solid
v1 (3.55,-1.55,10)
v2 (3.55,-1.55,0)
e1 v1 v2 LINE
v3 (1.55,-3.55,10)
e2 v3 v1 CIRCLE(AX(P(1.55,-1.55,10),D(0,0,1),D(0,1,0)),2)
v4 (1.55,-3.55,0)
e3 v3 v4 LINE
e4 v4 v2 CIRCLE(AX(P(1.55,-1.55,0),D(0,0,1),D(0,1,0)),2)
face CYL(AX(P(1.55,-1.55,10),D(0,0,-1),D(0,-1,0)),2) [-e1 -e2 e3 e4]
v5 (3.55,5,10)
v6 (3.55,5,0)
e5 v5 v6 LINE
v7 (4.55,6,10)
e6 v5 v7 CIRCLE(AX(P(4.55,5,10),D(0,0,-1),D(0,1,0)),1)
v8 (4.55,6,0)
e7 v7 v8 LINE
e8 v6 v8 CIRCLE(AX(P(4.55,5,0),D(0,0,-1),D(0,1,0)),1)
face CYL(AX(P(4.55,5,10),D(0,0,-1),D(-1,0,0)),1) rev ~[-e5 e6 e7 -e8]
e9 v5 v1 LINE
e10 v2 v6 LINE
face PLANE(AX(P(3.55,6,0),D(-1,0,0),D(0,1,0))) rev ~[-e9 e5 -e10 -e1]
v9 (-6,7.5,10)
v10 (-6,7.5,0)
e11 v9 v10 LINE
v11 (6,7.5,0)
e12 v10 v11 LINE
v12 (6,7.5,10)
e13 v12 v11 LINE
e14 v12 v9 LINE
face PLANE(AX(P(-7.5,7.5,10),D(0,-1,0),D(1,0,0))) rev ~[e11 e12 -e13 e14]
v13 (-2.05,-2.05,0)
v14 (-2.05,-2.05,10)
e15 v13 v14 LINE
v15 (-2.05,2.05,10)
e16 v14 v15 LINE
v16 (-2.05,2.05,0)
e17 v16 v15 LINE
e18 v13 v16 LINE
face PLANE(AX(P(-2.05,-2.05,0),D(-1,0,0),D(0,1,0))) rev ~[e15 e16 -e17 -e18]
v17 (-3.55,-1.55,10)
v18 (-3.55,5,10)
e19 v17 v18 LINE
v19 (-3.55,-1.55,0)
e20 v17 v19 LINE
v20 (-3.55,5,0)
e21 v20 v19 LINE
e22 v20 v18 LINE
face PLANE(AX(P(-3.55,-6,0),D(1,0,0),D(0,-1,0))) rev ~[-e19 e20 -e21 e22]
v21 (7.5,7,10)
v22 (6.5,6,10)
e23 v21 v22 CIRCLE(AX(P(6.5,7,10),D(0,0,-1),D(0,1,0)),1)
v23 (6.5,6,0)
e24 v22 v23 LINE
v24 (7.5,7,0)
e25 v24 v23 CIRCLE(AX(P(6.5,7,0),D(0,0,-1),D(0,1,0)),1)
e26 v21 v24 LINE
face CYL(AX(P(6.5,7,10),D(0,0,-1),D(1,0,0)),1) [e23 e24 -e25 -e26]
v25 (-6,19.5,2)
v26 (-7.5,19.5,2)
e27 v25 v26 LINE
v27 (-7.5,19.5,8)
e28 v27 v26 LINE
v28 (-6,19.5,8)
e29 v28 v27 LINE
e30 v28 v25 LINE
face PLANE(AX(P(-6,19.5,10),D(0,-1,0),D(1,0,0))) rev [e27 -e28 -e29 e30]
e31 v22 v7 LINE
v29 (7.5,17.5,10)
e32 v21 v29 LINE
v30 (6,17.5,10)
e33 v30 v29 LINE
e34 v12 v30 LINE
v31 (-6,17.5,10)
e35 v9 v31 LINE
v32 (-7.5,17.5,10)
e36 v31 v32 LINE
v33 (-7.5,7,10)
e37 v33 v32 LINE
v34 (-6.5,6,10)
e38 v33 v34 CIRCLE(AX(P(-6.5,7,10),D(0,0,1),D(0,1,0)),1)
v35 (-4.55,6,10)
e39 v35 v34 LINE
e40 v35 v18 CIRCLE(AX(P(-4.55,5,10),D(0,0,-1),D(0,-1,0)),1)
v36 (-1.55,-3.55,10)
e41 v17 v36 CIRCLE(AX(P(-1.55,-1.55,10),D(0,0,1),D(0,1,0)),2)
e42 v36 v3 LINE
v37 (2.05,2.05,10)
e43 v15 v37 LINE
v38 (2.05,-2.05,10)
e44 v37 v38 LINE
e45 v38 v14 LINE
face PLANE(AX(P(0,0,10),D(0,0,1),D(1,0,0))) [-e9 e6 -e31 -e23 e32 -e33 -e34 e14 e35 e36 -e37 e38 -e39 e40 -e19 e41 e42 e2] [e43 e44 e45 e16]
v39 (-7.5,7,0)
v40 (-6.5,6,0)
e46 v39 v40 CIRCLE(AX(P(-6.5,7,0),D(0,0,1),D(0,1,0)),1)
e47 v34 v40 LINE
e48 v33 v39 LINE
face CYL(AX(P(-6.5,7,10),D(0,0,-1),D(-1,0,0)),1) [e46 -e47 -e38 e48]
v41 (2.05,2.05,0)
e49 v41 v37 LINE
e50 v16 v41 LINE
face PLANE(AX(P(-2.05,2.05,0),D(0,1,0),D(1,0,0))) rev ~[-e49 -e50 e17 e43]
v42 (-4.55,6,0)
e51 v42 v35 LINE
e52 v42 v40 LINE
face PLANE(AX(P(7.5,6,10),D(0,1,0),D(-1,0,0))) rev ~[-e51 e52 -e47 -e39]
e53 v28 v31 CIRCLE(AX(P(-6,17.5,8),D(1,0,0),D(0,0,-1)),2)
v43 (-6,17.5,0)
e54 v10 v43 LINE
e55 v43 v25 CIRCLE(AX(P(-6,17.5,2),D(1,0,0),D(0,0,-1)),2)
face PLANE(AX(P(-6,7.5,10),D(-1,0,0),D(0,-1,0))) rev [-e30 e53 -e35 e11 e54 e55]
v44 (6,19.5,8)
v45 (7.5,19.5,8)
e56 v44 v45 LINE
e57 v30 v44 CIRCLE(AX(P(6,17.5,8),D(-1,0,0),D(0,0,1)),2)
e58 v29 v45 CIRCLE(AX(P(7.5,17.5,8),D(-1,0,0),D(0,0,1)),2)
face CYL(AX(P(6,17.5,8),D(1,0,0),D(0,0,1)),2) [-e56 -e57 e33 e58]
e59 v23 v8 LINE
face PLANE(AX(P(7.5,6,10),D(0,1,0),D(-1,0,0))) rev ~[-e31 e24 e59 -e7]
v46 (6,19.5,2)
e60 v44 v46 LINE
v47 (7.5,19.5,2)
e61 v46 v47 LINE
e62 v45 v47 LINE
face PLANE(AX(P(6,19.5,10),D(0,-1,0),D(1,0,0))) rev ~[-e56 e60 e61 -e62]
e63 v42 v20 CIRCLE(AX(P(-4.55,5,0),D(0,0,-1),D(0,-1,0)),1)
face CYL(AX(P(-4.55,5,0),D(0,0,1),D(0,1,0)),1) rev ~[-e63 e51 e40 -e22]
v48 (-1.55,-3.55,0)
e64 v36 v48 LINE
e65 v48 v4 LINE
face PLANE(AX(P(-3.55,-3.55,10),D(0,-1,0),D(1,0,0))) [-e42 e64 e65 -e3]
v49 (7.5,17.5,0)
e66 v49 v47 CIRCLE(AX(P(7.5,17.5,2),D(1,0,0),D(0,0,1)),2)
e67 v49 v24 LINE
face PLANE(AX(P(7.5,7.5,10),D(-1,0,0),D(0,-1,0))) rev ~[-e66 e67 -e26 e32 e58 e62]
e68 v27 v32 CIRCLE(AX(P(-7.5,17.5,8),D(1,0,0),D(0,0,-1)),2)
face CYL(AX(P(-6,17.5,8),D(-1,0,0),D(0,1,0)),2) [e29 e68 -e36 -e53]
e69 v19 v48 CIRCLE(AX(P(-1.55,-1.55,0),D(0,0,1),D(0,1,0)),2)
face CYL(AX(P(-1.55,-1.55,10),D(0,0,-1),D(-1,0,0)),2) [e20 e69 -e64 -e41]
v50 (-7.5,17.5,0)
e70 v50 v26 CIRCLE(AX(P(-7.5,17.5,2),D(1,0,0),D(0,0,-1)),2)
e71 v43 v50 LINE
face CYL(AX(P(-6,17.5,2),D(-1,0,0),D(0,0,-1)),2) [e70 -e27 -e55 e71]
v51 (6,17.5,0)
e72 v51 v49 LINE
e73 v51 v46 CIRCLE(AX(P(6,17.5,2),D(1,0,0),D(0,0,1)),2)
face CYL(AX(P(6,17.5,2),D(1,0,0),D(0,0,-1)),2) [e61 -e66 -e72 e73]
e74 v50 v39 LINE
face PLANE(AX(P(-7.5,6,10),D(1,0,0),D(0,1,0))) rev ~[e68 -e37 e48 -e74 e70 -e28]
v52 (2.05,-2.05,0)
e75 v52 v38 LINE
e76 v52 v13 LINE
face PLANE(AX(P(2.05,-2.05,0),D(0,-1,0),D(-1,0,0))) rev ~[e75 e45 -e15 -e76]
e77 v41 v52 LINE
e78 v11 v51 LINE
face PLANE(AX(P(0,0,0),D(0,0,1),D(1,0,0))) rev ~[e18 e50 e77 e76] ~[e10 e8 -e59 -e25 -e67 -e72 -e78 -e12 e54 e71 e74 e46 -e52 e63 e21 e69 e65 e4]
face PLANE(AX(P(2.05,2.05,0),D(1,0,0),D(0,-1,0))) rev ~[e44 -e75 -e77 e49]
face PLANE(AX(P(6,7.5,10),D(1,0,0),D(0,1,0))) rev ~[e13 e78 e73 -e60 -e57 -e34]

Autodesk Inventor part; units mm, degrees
ref_plane "YZ Plane" through (0, 0, 0) normal (1, 0, 0) x (0, 1, 0)
ref_plane "XZ Plane" through (0, 0, 0) normal (0, 1, 0) x (-1, 0, 0)
ref_plane "XY Plane" through (0, 0, 0) normal (0, 0, 1) x (1, 0, 0)
sketch "Sketch1" plane through (0, 0, 0) normal (0, 0, 1) x (1, 0, 0)
  line L0 (-2.05, 2.05) -> (2.05, 2.05)
  line L1 (2.05, 2.05) -> (2.05, -2.05)
  line L2 (2.05, -2.05) -> (-2.05, -2.05)
  line L3 (-2.05, -2.05) -> (-2.05, 2.05)
  line L4 (0, 2.05) -> (0, -2.05) construction
  line L5 (0, 7.5) -> (-15.55, 7.5)
  line L6 (-15.55, 7.5) -> (-15.55, 6)
  line L7 (-15.55, 6) -> (-3.55, 6)
  line L8 (-3.55, 6) -> (-3.55, -6)
  line L9 (-3.55, -6) -> (-15.55, -6)
  line L10 (-15.55, -6) -> (-15.55, -7.5)
  line L11 (-15.55, -7.5) -> (-0.55, -7.5)
  line L12 (-2.05, 0) -> (2.05, 0) construction
  line L13 (0, 7.5) -> (15.55, 7.5)
  line L14 (15.55, 7.5) -> (15.55, 6)
  line L15 (15.55, 6) -> (3.55, 6)
  line L16 (3.55, 6) -> (3.55, -6)
  line L17 (3.55, -6) -> (15.55, -6)
  line L18 (15.55, -6) -> (15.55, -7.5)
  line L19 (15.55, -7.5) -> (-0.55, -7.5)
  line L20 (-2.05, 2.05) -> (2.05, -2.05) construction
  line L21 (2.05, 2.05) -> (-2.05, -2.05) construction
  line L22 (0, 7.5) -> (0, 2.05) construction
  line L23 (-3.55, 6) -> (-3.55, 7.5)
  line L24 (-3.55, -6) -> (-3.55, -7.5)
  line L25 (3.55, 6) -> (3.55, 7.5)
  line L26 (3.55, -6) -> (3.55, -7.5)
  point P0 (0, 0)
  point P1 (0, 0)
  point P2 (0, 0)
  dimension "d3" = 4.1
  dimension "d4" = 4.1
  dimension "d5" = 12
  dimension "d6" = 1.5
  dimension "d7" = 1.5
  dimension "d8" = 5.45
  dimension "d9" = 5.45
  dimension "d10" = 1.5
  dimension "d11" = 12
  dimension "d37" = 15
extrude "Extrusion1" add sketch "Sketch1" along normal blind 10 contours L13 L25 L16 L26 L19 L11 L24 L8 L23 L5
sketch "Sketch5" plane through (0, 0, 10) normal (0, 0, 1) x (1, 0, 0)
  line L0 (6, 19.5) -> (7.5, 19.5)
  line L1 (7.5, 19.5) -> (7.5, 7.5)
  line L2 (7.5, 7.5) -> (6, 7.5)
  line L3 (6, 7.5) -> (6, 19.5)
  line L4 (3.55, 7.5) -> (-3.55, 7.5) projected
  line L5 (3.55, -7.5) -> (3.55, 7.5) projected
  line L6 (0, 0) -> (0, 23.4065) construction
  point P0 (15.55, 7.5)
  point P1 (-15.55, 7.5)
  point P2 (3.55, -6)
  point P3 (3.55, 6)
  dimension "d41" = 1.5
  dimension "d42" = 12
  dimension "d47" = 6
extrude "Extrusion5" add sketch "Sketch5" against normal up to surface (10 mm away)
mirror "Mirror1" about plane through (0, 0, 0) normal (1, 0, 0) of "Extrusion5"
sketch "Sketch7" plane through (0, 0, 10) normal (0, 0, 1) x (1, 0, 0)
  line L0 (-7.5, 19.5) -> (-7.5, 7.5) projected
  line L1 (-7.5, 7.5) -> (7.5, 7.5)
  line L2 (7.5, 7.5) -> (7.5, 6)
  line L3 (7.5, 6) -> (-7.5, 6)
  line L4 (-7.5, 6) -> (-7.5, 7.5)
  line L5 (7.5, 7.5) -> (7.5, 19.5) projected
  point P0 (0, 0)
  dimension "d53" = 1.5
extrude "Extrusion7" add sketch "Sketch7" against normal up to surface (10 mm away)
fillet "Fillet3" radius 1 4 edges at (-3.55, 6, 5) (3.55, 6, 5) (7.5, 6, 5) (-7.5, 6, 5)
sketch "Sketch8" plane through (0, 0, 10) normal (0, 0, 1) x (1, 0, 0)
  line L0 (-3.55, -3.55) -> (3.55, -3.55)
  line L1 (3.55, -3.55) -> (3.55, -7.5)
  line L2 (3.55, -7.5) -> (-3.55, -7.5)
  line L3 (-3.55, -7.5) -> (-3.55, -3.55)
  line L4 (2.05, -2.05) -> (-2.05, -2.05) projected
  line L5 (3.55, -7.5) -> (3.55, 5) projected
  line L6 (-3.55, 5) -> (-3.55, -7.5) projected
  line L7 (-3.55, -7.5) -> (3.55, -7.5) projected
  point P0 (0, 0)
  dimension "d57" = 1.5
extrude "Extrusion8" cut sketch "Sketch8" against normal blind 10
fillet "Fillet4" radius 2 4 edges at (-6.75, 19.5, 10) (-6.75, 19.5, 0) (6.75, 19.5, 0) (6.75, 19.5, 10)
fillet "Fillet5" radius 2 2 edges at (3.55, -3.55, 5) (-3.55, -3.55, 5)
equation "\"d7\" = d6"
equation "\"d8\" = d9"
properties part number "honeycomb_fuselage_interface" material "ABS Plastic"
